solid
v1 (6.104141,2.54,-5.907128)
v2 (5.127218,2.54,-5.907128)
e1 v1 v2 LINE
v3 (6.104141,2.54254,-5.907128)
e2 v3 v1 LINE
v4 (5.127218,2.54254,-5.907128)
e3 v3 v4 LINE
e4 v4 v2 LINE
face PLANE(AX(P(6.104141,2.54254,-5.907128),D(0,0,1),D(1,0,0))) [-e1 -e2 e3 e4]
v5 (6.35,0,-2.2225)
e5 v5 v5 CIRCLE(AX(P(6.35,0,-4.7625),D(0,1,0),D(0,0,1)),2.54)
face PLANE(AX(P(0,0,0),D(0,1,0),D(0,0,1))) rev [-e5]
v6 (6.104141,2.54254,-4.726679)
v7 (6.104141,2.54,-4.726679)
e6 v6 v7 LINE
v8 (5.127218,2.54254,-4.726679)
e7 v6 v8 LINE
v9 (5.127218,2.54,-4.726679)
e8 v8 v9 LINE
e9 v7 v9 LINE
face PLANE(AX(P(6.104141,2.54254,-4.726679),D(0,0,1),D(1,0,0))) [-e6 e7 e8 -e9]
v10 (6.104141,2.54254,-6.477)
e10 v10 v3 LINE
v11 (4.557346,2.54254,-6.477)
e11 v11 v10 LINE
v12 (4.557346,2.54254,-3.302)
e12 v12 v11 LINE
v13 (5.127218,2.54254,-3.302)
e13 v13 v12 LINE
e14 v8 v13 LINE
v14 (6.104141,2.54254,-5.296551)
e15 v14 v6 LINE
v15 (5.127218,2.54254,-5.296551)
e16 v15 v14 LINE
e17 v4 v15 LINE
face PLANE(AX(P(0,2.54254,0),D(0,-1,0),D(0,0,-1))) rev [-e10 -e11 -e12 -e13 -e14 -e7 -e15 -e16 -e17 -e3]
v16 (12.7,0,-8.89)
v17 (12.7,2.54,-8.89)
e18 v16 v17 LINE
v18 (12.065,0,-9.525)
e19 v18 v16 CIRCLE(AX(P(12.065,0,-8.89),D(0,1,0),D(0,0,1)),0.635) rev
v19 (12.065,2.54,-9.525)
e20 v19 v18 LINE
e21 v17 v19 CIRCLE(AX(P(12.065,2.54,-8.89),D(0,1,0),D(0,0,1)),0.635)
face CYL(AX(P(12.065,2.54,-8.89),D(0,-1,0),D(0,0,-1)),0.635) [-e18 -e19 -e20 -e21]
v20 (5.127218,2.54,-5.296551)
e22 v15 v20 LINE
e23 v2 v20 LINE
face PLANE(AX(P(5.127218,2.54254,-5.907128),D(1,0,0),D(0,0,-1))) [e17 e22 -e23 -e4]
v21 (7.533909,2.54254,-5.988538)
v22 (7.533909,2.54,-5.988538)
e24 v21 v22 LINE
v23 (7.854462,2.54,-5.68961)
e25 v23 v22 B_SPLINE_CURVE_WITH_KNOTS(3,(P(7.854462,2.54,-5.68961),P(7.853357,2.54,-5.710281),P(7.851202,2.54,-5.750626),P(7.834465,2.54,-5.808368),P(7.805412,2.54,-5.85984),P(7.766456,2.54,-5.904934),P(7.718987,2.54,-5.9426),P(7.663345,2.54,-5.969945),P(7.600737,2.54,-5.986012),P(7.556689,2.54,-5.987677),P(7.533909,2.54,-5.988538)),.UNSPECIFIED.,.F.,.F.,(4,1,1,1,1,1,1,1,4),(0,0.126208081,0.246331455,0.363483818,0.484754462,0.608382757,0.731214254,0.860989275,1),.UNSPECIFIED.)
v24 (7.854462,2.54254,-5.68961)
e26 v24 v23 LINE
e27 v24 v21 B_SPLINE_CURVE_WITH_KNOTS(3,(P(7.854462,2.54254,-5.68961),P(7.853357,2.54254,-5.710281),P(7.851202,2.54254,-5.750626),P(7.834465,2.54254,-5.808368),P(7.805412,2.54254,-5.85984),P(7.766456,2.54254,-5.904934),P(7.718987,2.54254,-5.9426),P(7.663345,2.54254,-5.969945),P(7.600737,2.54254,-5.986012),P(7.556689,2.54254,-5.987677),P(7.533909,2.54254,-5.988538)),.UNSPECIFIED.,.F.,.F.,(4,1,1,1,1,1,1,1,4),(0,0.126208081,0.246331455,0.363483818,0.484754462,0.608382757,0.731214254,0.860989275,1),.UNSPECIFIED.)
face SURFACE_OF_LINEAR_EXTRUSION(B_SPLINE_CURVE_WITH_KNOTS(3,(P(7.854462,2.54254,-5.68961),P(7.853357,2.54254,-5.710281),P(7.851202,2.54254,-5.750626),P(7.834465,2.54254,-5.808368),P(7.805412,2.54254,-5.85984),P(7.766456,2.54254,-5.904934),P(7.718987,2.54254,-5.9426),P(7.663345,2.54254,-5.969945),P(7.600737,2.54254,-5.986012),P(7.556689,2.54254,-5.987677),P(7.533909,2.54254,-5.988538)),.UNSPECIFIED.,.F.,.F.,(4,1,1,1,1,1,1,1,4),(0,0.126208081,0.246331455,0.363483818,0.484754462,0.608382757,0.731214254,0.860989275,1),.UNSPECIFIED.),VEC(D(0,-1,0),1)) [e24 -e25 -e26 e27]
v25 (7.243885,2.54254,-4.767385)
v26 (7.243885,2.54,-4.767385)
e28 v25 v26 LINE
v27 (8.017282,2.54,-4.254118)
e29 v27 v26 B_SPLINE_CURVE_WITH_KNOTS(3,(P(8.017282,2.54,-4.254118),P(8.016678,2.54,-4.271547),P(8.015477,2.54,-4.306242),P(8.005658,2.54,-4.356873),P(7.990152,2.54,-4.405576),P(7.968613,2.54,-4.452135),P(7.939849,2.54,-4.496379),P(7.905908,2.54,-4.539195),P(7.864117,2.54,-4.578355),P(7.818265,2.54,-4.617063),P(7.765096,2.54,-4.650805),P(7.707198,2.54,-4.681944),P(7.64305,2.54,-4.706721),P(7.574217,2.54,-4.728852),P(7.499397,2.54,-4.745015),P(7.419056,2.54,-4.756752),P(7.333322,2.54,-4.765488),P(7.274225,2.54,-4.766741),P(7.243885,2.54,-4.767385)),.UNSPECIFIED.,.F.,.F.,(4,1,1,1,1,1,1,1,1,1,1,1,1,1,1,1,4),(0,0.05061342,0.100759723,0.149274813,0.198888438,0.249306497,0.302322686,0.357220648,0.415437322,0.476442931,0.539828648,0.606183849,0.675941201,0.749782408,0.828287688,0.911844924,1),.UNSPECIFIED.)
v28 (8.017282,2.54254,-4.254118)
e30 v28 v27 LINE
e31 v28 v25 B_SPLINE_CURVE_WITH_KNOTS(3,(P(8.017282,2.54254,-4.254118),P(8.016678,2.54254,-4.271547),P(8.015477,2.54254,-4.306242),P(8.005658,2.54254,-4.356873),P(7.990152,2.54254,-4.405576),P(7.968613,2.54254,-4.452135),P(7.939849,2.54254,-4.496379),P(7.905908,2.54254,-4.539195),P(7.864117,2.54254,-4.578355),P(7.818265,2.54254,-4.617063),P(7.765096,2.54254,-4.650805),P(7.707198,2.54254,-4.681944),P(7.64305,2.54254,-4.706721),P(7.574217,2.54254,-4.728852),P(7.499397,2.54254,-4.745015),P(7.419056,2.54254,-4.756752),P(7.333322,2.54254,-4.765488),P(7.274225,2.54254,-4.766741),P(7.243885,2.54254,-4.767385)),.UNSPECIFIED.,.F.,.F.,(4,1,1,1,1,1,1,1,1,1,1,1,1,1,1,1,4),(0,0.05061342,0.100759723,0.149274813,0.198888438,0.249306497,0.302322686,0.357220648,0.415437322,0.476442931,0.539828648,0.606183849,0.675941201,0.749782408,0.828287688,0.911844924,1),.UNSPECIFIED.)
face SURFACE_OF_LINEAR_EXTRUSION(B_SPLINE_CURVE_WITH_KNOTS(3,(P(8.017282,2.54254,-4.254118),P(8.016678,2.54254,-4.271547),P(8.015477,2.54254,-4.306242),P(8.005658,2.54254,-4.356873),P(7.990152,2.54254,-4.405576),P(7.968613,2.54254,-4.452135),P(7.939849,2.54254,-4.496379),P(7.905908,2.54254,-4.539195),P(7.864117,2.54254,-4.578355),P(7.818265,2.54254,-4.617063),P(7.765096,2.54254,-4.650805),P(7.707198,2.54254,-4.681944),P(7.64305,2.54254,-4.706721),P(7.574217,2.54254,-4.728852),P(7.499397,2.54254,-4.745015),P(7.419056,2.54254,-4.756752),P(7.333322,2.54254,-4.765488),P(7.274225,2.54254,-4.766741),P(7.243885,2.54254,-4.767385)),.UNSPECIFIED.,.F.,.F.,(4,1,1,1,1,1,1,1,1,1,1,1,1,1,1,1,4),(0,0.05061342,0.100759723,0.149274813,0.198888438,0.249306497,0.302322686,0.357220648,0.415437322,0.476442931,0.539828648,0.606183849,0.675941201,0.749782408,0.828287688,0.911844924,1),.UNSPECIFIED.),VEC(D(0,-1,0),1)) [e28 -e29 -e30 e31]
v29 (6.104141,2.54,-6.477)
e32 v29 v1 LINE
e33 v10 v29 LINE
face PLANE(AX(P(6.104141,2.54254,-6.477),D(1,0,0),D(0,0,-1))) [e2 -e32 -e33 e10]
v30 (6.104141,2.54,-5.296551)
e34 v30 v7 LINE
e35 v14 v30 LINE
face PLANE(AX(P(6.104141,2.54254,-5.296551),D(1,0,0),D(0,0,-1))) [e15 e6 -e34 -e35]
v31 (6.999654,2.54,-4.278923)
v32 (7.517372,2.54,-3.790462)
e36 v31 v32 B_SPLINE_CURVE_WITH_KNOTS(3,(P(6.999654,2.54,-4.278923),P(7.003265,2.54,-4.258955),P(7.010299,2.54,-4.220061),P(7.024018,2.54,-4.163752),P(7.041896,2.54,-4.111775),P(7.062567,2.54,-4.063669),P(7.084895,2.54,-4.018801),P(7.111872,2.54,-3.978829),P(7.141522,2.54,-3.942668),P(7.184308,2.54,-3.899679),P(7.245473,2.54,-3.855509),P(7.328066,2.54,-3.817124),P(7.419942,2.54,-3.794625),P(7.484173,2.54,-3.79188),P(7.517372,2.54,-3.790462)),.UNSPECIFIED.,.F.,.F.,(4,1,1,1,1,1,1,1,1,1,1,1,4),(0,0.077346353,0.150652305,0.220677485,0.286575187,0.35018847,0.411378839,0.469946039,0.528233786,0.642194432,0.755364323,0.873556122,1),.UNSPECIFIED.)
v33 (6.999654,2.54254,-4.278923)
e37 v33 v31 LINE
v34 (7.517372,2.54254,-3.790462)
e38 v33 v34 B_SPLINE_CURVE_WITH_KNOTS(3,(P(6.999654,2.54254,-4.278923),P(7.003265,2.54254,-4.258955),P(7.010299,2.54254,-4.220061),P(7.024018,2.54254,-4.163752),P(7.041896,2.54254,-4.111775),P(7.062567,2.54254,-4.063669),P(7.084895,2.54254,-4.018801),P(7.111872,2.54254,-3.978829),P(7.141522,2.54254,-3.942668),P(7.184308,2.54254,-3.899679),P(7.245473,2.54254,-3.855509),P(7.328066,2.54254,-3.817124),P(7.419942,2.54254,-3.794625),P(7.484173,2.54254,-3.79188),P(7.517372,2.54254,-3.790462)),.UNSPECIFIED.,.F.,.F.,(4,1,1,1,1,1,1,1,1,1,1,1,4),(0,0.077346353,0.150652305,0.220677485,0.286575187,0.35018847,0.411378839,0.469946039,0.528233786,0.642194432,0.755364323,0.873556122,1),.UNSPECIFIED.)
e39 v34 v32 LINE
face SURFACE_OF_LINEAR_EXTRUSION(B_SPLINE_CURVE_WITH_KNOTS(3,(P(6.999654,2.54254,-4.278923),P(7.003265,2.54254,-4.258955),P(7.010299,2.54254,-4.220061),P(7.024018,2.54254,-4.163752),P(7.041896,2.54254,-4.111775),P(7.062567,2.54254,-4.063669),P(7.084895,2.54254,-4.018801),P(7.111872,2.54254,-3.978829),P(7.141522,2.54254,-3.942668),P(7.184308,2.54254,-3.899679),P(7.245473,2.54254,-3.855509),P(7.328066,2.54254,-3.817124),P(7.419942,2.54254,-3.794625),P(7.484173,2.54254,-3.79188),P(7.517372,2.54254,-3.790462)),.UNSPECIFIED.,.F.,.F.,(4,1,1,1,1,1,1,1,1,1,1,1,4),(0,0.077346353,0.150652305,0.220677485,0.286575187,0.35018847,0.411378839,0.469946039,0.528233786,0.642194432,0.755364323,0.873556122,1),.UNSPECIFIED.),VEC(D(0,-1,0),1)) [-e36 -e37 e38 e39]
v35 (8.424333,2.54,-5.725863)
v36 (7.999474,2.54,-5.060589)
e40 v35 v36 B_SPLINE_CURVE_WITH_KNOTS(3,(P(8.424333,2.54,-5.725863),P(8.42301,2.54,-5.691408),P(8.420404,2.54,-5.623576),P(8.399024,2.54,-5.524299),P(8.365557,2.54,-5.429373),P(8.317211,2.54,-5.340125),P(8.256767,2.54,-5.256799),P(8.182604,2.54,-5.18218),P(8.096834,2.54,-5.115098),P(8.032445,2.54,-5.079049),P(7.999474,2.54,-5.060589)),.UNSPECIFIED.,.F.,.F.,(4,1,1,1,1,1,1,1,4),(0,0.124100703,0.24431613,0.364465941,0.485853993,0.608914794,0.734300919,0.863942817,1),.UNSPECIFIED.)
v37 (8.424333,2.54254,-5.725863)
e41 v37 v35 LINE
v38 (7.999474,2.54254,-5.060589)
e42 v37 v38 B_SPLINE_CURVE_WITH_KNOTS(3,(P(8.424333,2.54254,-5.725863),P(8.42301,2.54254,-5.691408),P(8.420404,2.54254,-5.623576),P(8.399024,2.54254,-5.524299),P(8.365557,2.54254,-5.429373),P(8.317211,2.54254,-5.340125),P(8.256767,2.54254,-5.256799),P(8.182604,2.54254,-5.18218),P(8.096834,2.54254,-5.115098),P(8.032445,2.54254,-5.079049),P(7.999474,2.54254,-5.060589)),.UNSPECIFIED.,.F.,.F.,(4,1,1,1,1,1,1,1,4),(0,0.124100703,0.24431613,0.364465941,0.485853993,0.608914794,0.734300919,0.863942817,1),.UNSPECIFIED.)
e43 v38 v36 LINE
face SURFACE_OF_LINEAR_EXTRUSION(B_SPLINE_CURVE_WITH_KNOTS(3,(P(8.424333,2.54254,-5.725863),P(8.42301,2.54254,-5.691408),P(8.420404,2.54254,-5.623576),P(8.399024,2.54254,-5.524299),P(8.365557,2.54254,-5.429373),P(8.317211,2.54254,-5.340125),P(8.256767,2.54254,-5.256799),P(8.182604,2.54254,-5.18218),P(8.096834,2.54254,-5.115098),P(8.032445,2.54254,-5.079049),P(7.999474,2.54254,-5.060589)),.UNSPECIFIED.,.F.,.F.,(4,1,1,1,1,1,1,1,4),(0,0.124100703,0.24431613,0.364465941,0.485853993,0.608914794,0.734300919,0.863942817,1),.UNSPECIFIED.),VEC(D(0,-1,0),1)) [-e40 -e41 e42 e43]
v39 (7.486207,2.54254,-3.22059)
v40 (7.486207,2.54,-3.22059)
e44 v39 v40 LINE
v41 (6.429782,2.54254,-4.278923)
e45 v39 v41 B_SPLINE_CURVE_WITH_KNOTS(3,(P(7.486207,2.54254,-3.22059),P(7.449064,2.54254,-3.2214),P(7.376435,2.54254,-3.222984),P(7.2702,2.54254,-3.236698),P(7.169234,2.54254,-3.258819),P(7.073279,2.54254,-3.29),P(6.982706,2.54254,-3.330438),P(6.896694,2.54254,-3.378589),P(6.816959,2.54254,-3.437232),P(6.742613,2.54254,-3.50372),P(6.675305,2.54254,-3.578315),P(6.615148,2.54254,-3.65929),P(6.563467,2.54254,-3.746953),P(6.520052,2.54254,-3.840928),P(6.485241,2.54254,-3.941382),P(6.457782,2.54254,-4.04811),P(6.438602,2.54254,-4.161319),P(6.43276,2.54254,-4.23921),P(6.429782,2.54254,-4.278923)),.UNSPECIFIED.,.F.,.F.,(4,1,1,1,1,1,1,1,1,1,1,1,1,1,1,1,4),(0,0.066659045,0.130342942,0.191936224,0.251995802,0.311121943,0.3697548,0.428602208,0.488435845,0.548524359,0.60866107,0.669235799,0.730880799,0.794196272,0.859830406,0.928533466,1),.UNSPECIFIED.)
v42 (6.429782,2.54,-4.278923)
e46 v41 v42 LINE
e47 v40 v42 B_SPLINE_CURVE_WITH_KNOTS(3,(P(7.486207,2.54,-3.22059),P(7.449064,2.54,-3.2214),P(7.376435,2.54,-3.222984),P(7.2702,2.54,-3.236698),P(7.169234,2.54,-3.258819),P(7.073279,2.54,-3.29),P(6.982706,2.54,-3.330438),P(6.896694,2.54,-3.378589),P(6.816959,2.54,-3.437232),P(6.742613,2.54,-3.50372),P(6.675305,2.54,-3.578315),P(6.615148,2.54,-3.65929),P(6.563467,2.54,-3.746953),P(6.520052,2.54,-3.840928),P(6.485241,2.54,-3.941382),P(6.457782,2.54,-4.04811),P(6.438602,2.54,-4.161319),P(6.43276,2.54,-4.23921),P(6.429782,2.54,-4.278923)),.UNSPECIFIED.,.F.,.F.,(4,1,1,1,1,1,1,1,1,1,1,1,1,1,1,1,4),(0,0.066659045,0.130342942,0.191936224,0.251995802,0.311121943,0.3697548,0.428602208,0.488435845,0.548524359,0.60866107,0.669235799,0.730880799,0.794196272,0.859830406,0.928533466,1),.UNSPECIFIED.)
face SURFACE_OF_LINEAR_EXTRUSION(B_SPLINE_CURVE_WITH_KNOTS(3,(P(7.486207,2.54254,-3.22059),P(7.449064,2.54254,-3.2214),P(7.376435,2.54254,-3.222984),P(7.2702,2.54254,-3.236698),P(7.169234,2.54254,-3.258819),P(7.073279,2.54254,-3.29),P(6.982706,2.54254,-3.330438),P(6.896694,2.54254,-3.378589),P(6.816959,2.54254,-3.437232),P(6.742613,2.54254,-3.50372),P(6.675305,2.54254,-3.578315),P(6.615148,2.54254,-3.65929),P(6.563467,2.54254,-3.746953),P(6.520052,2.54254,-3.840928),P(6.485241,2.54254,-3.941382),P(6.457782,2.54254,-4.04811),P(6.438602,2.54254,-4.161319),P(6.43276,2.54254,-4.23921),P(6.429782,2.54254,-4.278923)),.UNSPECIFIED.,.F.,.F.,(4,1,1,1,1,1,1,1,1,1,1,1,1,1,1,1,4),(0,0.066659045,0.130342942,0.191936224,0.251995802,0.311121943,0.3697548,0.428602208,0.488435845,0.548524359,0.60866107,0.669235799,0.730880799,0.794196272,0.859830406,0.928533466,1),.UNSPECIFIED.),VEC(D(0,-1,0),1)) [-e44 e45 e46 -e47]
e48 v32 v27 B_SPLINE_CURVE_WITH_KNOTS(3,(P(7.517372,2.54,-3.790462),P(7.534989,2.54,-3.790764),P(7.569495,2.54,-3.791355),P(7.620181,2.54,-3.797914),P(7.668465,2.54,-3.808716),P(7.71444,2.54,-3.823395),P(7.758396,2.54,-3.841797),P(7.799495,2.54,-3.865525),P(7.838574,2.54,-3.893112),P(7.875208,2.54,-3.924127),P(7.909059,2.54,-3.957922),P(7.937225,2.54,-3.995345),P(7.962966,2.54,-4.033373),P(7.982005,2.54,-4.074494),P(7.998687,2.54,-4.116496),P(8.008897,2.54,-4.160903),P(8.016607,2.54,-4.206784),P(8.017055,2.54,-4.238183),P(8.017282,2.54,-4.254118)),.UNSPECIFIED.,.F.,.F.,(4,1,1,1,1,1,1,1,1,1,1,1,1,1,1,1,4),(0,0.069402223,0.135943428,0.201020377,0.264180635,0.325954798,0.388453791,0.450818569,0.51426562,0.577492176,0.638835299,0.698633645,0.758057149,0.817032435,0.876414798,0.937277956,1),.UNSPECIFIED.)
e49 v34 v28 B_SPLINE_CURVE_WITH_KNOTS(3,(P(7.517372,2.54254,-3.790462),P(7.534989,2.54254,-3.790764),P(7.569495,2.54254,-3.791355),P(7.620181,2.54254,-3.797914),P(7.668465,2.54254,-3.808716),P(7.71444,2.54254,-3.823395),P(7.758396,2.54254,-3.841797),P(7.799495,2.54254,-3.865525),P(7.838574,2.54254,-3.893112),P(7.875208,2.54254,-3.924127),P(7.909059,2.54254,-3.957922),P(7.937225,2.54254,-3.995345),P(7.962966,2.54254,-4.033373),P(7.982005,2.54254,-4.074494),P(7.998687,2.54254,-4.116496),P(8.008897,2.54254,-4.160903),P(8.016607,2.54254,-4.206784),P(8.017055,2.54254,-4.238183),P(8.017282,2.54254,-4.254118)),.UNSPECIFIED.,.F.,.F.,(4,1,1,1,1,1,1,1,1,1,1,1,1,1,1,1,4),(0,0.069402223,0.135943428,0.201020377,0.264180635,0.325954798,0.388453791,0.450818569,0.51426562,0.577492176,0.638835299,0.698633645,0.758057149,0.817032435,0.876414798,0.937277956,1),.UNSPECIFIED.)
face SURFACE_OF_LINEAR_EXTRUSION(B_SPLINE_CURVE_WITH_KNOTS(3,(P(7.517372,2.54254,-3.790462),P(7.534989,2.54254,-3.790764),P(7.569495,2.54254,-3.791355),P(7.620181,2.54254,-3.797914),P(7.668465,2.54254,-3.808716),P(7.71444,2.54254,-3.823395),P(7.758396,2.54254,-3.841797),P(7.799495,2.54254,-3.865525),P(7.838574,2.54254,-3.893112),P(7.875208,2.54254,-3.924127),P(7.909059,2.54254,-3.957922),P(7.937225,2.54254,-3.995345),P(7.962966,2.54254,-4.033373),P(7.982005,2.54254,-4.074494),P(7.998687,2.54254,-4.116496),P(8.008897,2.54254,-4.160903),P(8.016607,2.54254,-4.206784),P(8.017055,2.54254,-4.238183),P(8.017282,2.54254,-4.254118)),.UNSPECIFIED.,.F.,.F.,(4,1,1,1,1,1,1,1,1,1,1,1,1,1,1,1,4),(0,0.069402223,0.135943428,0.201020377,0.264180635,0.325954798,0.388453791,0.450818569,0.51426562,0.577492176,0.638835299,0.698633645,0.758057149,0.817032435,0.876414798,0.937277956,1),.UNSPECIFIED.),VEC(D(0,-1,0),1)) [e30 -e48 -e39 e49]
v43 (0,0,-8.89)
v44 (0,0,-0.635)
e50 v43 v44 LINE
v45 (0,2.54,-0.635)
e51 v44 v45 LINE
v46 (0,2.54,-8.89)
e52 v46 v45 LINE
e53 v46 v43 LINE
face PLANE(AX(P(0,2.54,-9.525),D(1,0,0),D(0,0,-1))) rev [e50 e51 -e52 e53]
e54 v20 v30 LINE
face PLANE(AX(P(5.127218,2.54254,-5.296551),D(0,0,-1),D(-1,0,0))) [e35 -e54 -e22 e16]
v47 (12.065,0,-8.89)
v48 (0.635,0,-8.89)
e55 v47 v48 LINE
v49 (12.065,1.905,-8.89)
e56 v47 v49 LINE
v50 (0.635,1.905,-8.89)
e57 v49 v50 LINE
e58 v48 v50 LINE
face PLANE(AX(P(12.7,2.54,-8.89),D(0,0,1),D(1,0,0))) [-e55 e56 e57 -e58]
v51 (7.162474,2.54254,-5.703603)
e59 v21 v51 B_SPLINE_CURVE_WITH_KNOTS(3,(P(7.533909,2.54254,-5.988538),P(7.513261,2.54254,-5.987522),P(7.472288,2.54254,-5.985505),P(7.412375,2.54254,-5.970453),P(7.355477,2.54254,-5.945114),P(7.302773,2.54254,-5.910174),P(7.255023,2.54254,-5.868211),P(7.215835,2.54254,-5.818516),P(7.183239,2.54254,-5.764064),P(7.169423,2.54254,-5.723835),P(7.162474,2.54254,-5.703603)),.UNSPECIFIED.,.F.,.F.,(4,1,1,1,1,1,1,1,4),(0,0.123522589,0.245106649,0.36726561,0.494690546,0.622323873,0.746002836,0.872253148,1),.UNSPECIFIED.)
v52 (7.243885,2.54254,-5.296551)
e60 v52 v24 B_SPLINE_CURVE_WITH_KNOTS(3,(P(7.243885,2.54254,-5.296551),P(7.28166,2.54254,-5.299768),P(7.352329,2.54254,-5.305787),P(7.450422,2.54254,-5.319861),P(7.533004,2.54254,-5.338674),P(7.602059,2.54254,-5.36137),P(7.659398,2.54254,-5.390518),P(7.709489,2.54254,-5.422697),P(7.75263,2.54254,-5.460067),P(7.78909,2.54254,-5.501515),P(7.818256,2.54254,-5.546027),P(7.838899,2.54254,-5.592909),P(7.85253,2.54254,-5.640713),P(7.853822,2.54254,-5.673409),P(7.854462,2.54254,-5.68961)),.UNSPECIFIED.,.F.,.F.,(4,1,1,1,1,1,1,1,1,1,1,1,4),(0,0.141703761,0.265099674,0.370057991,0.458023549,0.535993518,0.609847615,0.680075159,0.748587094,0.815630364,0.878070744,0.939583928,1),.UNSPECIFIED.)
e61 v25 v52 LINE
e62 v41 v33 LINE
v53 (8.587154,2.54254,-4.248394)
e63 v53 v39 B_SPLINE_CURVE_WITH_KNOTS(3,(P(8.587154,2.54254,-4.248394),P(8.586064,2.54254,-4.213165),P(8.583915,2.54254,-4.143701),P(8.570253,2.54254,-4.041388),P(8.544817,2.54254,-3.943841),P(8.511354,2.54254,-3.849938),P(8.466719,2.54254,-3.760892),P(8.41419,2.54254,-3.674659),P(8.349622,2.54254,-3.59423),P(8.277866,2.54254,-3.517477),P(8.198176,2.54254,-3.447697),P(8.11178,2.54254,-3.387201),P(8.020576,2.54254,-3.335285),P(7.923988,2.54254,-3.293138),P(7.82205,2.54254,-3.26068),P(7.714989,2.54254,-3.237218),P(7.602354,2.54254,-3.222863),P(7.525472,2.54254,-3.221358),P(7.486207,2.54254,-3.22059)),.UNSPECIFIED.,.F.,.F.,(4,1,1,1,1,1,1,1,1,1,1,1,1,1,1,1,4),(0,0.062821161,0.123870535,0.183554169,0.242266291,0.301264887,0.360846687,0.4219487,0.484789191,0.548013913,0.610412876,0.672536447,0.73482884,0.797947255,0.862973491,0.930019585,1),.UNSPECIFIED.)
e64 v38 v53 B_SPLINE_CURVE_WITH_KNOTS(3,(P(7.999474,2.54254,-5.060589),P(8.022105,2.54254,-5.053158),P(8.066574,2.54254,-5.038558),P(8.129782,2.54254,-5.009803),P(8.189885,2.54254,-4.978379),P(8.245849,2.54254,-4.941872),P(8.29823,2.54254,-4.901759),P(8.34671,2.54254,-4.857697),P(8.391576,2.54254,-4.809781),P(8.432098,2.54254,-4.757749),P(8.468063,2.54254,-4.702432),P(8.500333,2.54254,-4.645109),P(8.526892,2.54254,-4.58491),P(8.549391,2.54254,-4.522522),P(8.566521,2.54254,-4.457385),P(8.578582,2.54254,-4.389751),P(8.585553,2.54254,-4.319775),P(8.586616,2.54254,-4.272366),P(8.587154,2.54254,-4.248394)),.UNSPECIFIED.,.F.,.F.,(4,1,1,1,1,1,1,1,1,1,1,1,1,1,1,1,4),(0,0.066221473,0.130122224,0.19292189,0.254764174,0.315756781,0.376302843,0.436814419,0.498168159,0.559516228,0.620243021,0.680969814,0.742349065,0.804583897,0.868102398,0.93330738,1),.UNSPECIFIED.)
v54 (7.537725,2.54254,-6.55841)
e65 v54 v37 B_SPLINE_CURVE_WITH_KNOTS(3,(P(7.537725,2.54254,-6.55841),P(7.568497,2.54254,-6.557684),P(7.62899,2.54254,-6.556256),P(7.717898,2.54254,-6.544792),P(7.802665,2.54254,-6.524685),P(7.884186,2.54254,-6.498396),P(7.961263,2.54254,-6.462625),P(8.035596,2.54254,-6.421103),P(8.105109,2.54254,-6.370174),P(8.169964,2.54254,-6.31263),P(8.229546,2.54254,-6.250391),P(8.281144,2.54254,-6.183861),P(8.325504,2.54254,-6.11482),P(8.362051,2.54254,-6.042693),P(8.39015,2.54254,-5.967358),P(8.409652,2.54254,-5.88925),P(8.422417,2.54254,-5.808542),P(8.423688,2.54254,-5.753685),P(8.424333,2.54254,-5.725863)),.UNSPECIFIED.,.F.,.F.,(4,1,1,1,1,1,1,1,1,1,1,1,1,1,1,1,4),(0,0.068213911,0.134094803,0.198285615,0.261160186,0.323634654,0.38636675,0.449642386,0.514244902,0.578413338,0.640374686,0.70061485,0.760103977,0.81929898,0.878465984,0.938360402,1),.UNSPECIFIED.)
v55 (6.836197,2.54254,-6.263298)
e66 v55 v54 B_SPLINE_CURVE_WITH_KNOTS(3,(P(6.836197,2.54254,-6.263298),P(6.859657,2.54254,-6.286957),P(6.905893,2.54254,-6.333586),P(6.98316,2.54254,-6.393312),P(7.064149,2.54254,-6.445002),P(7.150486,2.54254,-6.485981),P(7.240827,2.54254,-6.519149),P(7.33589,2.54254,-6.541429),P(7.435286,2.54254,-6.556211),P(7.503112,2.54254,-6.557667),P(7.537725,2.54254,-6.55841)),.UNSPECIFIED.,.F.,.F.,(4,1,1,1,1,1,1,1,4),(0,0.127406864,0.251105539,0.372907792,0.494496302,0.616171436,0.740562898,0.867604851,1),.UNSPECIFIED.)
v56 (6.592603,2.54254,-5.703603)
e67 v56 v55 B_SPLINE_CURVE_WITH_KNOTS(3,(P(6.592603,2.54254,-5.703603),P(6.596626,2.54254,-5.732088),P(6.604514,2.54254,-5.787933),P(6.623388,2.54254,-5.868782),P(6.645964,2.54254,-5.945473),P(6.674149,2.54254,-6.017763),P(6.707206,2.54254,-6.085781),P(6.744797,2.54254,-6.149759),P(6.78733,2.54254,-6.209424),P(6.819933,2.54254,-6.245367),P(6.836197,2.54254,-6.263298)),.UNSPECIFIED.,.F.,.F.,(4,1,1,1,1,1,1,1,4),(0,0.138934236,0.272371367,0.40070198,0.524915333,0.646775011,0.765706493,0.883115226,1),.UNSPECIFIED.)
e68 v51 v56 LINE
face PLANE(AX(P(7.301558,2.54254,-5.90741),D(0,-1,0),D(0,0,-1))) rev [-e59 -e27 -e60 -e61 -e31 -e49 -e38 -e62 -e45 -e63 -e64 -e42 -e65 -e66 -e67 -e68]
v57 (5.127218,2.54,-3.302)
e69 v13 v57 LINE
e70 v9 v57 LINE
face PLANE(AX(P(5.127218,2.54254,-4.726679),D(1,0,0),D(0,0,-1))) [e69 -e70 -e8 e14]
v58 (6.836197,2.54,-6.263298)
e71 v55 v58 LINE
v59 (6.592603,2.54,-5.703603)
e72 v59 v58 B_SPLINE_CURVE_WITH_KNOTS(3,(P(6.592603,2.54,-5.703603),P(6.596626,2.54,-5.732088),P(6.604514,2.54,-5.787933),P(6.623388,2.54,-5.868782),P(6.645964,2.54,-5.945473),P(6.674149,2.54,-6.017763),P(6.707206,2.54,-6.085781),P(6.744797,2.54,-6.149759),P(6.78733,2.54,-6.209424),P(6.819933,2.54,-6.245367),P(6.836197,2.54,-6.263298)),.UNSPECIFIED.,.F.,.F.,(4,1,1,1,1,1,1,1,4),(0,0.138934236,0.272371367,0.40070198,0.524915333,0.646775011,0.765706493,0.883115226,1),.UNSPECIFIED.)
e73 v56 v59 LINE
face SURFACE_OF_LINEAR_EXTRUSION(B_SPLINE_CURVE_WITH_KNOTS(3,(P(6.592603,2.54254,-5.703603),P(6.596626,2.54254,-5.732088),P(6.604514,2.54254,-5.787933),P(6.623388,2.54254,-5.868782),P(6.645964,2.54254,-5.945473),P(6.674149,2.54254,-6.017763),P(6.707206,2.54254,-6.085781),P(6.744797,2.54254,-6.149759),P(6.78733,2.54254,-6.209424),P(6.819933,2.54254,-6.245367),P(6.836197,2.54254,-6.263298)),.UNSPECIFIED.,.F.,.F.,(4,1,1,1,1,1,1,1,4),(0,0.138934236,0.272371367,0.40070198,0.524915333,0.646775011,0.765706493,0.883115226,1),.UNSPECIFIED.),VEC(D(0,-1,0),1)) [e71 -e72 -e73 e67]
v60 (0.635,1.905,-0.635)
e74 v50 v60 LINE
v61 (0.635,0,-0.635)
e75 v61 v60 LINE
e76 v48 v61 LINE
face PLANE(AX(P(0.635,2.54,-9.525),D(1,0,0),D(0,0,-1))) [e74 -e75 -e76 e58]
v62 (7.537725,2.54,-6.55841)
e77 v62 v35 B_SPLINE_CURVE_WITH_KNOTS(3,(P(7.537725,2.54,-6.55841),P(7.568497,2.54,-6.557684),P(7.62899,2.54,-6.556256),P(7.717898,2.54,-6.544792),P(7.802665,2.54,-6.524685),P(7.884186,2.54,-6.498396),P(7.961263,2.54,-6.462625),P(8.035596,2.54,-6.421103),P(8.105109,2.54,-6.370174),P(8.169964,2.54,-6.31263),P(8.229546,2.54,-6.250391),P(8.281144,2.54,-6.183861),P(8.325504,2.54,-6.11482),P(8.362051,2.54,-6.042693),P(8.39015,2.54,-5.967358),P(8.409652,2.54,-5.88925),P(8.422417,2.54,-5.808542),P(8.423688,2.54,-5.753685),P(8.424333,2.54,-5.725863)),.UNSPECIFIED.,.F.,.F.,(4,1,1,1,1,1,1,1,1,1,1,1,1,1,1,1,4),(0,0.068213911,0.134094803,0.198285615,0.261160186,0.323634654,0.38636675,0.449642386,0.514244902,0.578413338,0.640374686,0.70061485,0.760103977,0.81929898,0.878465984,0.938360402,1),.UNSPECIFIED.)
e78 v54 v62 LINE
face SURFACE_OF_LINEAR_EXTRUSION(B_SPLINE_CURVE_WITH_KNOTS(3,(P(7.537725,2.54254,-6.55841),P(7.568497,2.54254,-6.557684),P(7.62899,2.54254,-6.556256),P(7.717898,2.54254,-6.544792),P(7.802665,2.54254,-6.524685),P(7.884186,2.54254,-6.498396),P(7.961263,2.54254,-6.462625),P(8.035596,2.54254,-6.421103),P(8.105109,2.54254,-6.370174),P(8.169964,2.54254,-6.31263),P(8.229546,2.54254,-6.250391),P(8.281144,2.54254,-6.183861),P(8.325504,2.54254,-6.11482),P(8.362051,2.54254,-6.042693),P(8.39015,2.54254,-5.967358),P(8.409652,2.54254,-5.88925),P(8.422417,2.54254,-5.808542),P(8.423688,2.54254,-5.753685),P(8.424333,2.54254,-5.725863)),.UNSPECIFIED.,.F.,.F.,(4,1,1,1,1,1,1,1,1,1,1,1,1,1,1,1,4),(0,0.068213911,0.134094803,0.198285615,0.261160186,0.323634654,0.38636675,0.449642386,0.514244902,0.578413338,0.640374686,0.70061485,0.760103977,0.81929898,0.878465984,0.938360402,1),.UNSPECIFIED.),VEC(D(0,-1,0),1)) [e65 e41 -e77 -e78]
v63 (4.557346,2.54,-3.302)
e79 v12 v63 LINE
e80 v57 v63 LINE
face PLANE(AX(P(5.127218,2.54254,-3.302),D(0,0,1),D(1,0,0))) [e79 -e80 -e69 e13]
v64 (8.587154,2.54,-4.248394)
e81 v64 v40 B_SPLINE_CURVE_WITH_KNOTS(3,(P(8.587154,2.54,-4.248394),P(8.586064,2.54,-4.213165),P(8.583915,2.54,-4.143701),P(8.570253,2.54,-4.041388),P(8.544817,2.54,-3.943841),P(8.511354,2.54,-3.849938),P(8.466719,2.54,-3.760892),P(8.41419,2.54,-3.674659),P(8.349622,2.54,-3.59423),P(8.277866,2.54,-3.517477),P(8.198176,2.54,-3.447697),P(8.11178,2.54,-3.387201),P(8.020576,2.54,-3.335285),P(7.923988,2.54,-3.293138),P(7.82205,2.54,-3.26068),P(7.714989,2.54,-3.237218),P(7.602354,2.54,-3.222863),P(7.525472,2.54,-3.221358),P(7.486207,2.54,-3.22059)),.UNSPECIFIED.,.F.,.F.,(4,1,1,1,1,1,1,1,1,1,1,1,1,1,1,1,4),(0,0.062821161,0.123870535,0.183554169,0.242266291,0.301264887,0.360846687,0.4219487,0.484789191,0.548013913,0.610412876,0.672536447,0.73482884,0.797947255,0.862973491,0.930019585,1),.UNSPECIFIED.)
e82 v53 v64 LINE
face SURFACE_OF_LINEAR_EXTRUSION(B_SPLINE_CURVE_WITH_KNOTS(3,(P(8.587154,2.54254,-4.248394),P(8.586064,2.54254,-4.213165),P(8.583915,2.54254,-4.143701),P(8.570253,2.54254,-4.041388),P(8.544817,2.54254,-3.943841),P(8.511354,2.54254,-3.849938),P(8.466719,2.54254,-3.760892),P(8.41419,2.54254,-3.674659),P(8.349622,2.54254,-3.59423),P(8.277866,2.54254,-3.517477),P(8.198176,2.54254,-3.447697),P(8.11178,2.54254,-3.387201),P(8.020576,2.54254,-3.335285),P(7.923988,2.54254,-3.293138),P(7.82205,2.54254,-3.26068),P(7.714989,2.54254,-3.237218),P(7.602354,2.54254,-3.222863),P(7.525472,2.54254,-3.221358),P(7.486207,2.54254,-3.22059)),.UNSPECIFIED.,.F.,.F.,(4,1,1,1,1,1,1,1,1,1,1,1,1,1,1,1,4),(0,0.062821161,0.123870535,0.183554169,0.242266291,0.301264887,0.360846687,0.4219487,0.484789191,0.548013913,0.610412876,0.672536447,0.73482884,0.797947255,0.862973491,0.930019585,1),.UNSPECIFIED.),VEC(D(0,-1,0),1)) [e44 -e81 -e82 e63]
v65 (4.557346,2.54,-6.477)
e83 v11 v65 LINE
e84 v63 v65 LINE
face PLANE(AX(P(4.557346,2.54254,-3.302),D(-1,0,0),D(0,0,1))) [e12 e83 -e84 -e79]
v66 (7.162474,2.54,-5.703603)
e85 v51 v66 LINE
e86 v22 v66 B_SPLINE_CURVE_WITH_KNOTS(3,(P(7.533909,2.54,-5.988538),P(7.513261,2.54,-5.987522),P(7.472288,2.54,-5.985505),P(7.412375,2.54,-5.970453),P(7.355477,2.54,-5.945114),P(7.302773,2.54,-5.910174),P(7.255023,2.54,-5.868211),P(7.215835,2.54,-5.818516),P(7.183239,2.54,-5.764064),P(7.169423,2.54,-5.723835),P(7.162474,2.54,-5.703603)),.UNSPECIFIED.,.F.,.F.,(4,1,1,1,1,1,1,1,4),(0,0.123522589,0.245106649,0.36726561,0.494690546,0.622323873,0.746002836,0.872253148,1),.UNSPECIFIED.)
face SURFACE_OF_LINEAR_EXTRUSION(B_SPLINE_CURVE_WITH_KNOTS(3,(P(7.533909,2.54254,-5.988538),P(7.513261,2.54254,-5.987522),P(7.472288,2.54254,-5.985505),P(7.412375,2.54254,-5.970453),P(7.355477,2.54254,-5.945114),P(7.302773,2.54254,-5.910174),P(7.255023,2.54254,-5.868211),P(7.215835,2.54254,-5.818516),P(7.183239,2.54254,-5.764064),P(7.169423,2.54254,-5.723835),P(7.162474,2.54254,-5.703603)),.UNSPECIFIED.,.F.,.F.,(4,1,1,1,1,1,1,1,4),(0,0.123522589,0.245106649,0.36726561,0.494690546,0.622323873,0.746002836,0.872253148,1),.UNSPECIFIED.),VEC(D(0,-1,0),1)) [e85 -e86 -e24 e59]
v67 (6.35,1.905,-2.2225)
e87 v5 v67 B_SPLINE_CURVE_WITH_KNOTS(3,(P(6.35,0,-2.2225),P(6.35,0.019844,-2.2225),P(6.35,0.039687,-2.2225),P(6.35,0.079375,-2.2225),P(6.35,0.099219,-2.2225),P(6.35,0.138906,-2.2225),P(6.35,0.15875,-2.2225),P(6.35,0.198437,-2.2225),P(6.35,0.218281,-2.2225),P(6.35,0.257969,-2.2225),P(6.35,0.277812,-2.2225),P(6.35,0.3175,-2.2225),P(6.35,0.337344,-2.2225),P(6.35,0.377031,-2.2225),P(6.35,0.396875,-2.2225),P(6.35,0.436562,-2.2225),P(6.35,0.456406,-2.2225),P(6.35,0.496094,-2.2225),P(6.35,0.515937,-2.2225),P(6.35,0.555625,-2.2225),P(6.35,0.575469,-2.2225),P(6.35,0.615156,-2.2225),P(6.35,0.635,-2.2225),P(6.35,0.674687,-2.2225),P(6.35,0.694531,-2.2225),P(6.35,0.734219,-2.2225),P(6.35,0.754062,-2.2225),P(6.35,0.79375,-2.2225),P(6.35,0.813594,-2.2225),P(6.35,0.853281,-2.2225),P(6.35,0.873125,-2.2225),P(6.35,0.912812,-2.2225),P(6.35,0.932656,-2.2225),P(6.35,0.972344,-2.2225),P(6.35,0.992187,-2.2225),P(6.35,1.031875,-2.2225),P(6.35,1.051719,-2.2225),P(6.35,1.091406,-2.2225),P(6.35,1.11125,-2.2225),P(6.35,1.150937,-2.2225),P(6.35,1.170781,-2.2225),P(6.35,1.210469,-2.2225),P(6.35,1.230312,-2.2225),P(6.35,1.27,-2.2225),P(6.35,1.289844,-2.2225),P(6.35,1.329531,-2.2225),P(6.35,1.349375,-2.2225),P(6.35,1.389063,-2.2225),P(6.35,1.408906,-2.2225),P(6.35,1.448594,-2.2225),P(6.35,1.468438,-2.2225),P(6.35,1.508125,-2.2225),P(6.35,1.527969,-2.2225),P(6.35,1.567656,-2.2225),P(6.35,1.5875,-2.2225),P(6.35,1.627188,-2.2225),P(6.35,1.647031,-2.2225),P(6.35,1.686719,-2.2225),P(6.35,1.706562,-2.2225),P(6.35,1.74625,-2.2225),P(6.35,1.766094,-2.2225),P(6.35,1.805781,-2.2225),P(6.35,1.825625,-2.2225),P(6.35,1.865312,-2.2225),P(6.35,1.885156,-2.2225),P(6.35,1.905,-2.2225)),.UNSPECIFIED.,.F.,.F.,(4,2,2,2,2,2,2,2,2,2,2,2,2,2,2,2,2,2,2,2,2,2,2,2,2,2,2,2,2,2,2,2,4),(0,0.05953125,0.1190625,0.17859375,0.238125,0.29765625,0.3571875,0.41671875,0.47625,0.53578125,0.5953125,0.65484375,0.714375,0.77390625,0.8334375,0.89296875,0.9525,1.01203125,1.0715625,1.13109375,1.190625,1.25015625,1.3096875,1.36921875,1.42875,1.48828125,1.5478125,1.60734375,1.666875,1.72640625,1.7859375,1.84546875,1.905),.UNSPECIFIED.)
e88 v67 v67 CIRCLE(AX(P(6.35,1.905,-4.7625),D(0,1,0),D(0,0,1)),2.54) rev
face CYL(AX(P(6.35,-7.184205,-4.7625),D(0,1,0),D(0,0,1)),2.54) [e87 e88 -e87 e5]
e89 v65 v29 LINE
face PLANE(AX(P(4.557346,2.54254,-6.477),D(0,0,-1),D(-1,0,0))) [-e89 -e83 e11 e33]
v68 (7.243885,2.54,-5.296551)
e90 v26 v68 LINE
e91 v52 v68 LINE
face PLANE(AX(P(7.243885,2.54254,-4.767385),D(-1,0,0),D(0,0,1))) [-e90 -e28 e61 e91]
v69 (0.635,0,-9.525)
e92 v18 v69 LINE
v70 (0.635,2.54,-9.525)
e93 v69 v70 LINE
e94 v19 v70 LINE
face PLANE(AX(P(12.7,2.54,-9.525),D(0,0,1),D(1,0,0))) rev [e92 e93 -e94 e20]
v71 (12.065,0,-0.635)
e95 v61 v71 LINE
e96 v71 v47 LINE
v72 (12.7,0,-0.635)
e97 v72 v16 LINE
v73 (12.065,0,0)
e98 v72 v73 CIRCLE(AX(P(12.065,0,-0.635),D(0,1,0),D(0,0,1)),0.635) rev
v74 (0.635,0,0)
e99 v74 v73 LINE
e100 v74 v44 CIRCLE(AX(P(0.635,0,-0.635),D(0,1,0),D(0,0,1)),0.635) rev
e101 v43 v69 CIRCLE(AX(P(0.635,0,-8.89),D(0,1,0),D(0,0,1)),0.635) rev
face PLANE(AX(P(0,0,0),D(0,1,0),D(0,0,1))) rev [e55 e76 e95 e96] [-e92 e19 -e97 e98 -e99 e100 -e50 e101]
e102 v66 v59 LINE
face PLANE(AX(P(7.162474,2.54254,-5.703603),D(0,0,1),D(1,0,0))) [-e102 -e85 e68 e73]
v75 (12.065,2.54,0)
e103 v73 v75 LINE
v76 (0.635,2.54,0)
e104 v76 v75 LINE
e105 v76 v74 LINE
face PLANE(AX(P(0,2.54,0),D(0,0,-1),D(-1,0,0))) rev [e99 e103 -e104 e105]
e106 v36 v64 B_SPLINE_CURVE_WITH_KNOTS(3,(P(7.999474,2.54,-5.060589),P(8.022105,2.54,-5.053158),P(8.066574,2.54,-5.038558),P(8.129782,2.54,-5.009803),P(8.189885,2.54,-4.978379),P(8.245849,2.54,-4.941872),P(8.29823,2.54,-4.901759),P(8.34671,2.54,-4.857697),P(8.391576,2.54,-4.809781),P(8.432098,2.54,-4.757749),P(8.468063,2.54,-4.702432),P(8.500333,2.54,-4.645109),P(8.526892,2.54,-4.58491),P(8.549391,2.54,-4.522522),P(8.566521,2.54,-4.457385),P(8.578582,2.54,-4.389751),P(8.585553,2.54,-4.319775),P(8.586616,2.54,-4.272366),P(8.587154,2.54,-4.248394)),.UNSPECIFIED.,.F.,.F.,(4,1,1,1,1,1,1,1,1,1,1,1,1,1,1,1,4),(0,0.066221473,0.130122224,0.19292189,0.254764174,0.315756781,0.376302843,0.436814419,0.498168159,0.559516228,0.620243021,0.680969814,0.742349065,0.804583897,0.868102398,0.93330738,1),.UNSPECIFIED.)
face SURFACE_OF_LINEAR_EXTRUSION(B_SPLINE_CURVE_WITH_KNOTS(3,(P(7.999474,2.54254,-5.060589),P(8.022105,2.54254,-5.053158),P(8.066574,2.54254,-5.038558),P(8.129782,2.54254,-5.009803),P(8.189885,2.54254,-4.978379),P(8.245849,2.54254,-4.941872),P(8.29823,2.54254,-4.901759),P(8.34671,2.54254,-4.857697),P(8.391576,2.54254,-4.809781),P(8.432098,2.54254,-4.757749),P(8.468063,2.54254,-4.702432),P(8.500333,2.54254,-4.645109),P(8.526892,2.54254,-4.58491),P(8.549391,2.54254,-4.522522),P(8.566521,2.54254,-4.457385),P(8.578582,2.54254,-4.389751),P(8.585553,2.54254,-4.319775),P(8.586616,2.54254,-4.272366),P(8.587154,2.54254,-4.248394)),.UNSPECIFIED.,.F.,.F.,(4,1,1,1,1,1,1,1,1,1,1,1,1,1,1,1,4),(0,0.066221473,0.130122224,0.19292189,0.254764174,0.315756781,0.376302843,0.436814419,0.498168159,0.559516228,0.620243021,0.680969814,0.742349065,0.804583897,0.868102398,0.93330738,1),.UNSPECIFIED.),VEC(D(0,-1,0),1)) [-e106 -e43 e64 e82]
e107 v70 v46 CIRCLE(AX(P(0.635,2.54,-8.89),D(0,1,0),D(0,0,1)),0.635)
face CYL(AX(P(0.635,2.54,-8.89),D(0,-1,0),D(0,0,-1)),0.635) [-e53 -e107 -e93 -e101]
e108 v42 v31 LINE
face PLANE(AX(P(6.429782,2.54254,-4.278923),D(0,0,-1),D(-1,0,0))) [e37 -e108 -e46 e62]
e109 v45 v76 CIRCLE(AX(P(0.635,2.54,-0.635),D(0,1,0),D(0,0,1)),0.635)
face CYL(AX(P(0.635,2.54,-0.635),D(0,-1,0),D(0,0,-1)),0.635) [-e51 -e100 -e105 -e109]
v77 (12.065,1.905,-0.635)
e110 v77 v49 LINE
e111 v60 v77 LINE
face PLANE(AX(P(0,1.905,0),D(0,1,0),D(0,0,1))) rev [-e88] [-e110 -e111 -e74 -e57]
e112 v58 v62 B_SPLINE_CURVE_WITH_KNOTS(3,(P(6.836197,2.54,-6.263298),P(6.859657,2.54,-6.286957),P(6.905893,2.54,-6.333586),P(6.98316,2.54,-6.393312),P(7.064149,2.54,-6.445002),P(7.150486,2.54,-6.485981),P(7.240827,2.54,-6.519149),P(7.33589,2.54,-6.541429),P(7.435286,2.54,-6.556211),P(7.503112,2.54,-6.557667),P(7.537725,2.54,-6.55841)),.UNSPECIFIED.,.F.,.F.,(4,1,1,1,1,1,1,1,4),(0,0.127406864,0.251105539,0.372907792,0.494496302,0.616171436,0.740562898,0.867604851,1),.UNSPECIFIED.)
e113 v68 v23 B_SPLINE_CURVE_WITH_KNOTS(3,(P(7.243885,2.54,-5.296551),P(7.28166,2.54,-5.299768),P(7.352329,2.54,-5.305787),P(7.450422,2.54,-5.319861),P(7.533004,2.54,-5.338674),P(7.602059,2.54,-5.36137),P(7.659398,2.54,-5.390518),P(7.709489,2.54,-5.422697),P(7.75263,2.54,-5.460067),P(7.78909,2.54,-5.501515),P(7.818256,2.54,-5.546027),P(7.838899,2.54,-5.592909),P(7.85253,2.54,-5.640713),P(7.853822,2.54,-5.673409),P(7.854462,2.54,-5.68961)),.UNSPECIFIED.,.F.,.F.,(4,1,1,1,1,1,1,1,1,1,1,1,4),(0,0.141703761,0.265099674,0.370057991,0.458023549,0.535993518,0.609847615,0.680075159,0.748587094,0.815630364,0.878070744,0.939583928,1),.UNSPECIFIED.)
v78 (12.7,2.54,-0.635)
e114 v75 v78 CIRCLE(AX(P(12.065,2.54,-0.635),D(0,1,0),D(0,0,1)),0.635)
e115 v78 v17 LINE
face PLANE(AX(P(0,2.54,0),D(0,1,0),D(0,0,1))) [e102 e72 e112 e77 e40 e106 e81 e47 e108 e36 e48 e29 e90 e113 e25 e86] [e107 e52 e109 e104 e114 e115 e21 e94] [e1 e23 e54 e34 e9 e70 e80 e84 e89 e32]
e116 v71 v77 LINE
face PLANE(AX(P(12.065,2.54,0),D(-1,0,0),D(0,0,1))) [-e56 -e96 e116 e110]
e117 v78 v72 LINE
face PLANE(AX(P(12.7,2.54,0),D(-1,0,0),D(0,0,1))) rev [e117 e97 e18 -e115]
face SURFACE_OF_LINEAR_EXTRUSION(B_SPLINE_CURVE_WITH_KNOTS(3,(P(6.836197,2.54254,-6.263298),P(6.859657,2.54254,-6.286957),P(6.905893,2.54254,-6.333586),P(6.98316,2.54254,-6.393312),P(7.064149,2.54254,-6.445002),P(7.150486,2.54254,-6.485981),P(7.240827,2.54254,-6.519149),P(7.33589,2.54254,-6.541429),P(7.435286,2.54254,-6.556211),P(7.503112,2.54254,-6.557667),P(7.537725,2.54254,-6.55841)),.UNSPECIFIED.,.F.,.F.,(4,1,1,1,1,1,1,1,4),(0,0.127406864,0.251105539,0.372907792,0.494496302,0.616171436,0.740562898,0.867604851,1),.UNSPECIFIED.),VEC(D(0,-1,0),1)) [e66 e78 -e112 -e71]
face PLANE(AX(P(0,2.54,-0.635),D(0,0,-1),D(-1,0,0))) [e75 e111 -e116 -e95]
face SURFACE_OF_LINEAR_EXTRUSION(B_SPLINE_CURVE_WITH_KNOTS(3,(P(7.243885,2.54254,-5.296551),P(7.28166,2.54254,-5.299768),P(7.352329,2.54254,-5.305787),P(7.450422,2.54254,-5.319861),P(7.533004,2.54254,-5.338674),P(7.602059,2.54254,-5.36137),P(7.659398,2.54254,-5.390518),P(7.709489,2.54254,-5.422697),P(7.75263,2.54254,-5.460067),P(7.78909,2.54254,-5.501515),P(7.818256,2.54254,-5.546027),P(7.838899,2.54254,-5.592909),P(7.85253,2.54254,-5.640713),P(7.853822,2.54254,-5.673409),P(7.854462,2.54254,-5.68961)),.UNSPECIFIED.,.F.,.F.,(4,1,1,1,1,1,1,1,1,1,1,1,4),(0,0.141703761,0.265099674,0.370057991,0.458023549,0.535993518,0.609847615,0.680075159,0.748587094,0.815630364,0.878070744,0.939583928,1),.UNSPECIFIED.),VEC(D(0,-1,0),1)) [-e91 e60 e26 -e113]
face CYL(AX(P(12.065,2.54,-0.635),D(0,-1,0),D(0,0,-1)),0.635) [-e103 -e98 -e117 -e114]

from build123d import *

# Parameters (mm, degrees)
SKETCH1_W           = 12.7
SKETCH1_H           = 9.525
BOSS_EXTRUDE1_DEPTH = 2.54
FILLET1_R           = 0.635
SHELL1_START        = 0.635
SHELL1_OUTLINE_W    = 1.905
SHELL1_OUTLINE_H    = 8.255
SHELL1_DEPTH        = 11.43
SKETCH2_R           = 2.54
BOSS_EXTRUDE2_DEPTH = 1.905
BOSS_EXTRUDE3_DEPTH = 0.00254


# Read off the part's stored shape, not the designer's step: Shell1
with BuildPart() as part:
    # Sketch1 → Boss-Extrude1 (new body)
    with BuildSketch(Plane(origin=(0, 0, 0), x_dir=(1, 0, 0), z_dir=(0, 1, 0))):
        with Locations((6.35, 4.7625)):
            Rectangle(SKETCH1_W, SKETCH1_H)
    extrude(amount=BOSS_EXTRUDE1_DEPTH)

    # Fillet1
    fillet1_edges = [part.edges().sort_by_distance(p)[0] for p in [
        (0, 1.27, -9.525),
        (12.7, 1.27, -9.525),
        (12.7, 1.27, 0),
        (0, 1.27, 0),
    ]]
    fillet(fillet1_edges, radius=FILLET1_R)

    # Shell1 outline → Shell1 (cut)
    with BuildSketch(Plane.YZ.offset(SHELL1_START)):
        with Locations((0.9525, -4.7625)):
            Rectangle(SHELL1_OUTLINE_W, SHELL1_OUTLINE_H)
    extrude(amount=SHELL1_DEPTH, mode=Mode.SUBTRACT)

    # Sketch2 → Boss-Extrude2 (add)
    with BuildSketch(Plane(origin=(0, 1.905, 0), x_dir=(-1, 0, 0), z_dir=(0, -1, 0))):
        with Locations(Location((-6.35, 4.7625, 0), (0, 0, 270))):
            Circle(SKETCH2_R)
    extrude(amount=BOSS_EXTRUDE2_DEPTH)

    # Sketch3 → Boss-Extrude3 (add)
    with BuildSketch(Plane(origin=(0, 2.54, 0), x_dir=(1, 0, 0), z_dir=(0, 1, 0))):
        Polygon((4.557346154, 6.477), (6.104141026, 6.477), (6.104141026, 5.907128205), (5.127217949, 5.907128205), (5.127217949, 5.296551282), (6.104141026, 5.296551282), (6.104141026, 4.726679487), (5.127217949, 4.726679487), (5.127217949, 3.302), (4.557346154, 3.302), align=None)
        with BuildLine():
            Line((7.162474359, 5.703602564), (6.592602564, 5.703602564))
            add(Edge.make_bspline(
                [(6.592602564, 5.703602564), (6.596626076, 5.732088422), (6.604513904, 5.78793306), (6.623388421, 5.868782184), (6.645964381, 5.945473111), (6.674149313, 6.017762976), (6.707205653, 6.085780553), (6.744797255, 6.149759244), (6.787330498, 6.20942444), (6.81993268, 6.245366991), (6.836197316, 6.263298077)],
                knots=[0, 0, 0, 0, 1.111473889, 2.178970933, 3.205615836, 4.199322666, 5.174200091, 6.12565194, 7.064921805, 8, 8, 8, 8], degree=3))
            add(Edge.make_bspline(
                [(6.836197316, 6.263298077), (6.859656898, 6.286956845), (6.905893269, 6.333585791), (6.983159668, 6.39331232), (7.064149124, 6.44500157), (7.150485915, 6.48598118), (7.240826576, 6.519149428), (7.335889528, 6.541428614), (7.435286308, 6.556211051), (7.503112106, 6.557667173), (7.53772476, 6.558410256)],
                knots=[0, 0, 0, 0, 1.01925491, 2.00884431, 2.983262333, 3.955970413, 4.92937149, 5.924503185, 6.940838805, 8, 8, 8, 8], degree=3))
            add(Edge.make_bspline(
                [(7.53772476, 6.558410256), (7.56849719, 6.55768378), (7.628989587, 6.556255673), (7.71789819, 6.544791605), (7.802665103, 6.524684907), (7.884186336, 6.49839585), (7.961262978, 6.462625195), (8.035596185, 6.421103078), (8.105109084, 6.370174475), (8.169964323, 6.31263028), (8.22954623, 6.2503906), (8.281144422, 6.1838615), (8.325504313, 6.114820126), (8.362050997, 6.042692875), (8.39015043, 5.9673577), (8.40965227, 5.8892498), (8.422416697, 5.808541527), (8.423688368, 5.753685202), (8.424333333, 5.725863181)],
                knots=[0, 0, 0, 0, 1.091422571, 2.145516843, 3.172569842, 4.178562979, 5.178154469, 6.181868002, 7.194278174, 8.227918432, 9.254613415, 10.245994977, 11.209837596, 12.161663635, 13.10878368, 14.055455738, 15.013766427, 16, 16, 16, 16], degree=3))
            add(Edge.make_bspline(
                [(8.424333333, 5.725863181), (8.423009825, 5.691407926), (8.420404245, 5.623576121), (8.399023573, 5.524299234), (8.365557006, 5.429372814), (8.317211295, 5.340125024), (8.256766844, 5.256798746), (8.182603526, 5.182179827), (8.096833706, 5.115098345), (8.032445159, 5.079048748), (7.999473558, 5.060588742)],
                knots=[0, 0, 0, 0, 0.992805628, 1.954529043, 2.915727527, 3.886831945, 4.871318353, 5.87440735, 6.911542536, 8, 8, 8, 8], degree=3))
            add(Edge.make_bspline(
                [(7.999473558, 5.060588742), (8.022104759, 5.053158442), (8.066574055, 5.038558236), (8.129781812, 5.009803295), (8.189885167, 4.978378911), (8.245849161, 4.94187206), (8.298230423, 4.901758919), (8.346709632, 4.857696584), (8.391576439, 4.809781133), (8.432098412, 4.757749048), (8.468063246, 4.702432482), (8.500332577, 4.645109215), (8.526892035, 4.584909929), (8.549391202, 4.52252214), (8.566520788, 4.45738514), (8.578581546, 4.389751328), (8.585552961, 4.319774984), (8.58661622, 4.272366053), (8.587153846, 4.248394231)],
                knots=[0, 0, 0, 0, 1.059543567, 2.081955587, 3.086750234, 4.076226789, 5.052108497, 6.020845489, 6.989030705, 7.970690546, 8.952259656, 9.923888338, 10.895517021, 11.877585046, 12.873342345, 13.889638361, 14.932918083, 16, 16, 16, 16], degree=3))
            add(Edge.make_bspline(
                [(8.587153846, 4.248394231), (8.586064006, 4.213165386), (8.583915064, 4.143701278), (8.570253093, 4.041387755), (8.544816966, 3.943840902), (8.511354332, 3.849938294), (8.46671881, 3.760892179), (8.414190304, 3.674659071), (8.349622216, 3.594229511), (8.277865874, 3.517477148), (8.198176272, 3.447697337), (8.111779779, 3.387201381), (8.020576181, 3.335285086), (7.923988457, 3.29313796), (7.822050165, 3.260679852), (7.714988515, 3.237217635), (7.602353665, 3.222863063), (7.525471567, 3.221358258), (7.486207332, 3.220589744)],
                knots=[0, 0, 0, 0, 1.005138573, 1.981928558, 2.936866704, 3.876260664, 4.820238198, 5.773547, 6.751179199, 7.756627054, 8.768222608, 9.766606018, 10.760583154, 11.757261445, 12.767156078, 13.807575856, 14.880313354, 16, 16, 16, 16], degree=3))
            add(Edge.make_bspline(
                [(7.486207332, 3.220589744), (7.449063998, 3.221400012), (7.376435124, 3.222984385), (7.270200196, 3.236697937), (7.169233952, 3.258819009), (7.073278726, 3.290000494), (6.98270576, 3.330437552), (6.896693704, 3.378589014), (6.816958908, 3.437232146), (6.742612971, 3.503719685), (6.67530511, 3.578314929), (6.615147733, 3.659289915), (6.56346732, 3.746952559), (6.52005193, 3.84092833), (6.485240973, 3.941382088), (6.457782192, 4.048109556), (6.438601784, 4.161319247), (6.432760351, 4.239209923), (6.429782051, 4.278923077)],
                knots=[0, 0, 0, 0, 1.066544725, 2.085487077, 3.070979577, 4.031932826, 4.977951092, 5.916076795, 6.857635327, 7.814973522, 8.776389752, 9.738577119, 10.707772778, 11.69409279, 12.707140348, 13.757286496, 14.856535458, 16, 16, 16, 16], degree=3))
            Line((6.429782051, 4.278923077), (6.999653846, 4.278923077))
            add(Edge.make_bspline(
                [(6.999653846, 4.278923077), (7.003265064, 4.258954782), (7.010298859, 4.220061291), (7.024017843, 4.163752162), (7.041895594, 4.111775358), (7.062566722, 4.063668911), (7.084894652, 4.018801199), (7.111872131, 3.978829299), (7.141522391, 3.942667809), (7.184307932, 3.899678631), (7.245472811, 3.855509046), (7.32806566, 3.817123574), (7.419942383, 3.794624972), (7.484173376, 3.791880212), (7.517372196, 3.790461538)],
                knots=[0, 0, 0, 0, 0.928156231, 1.807827665, 2.648129825, 3.438902246, 4.202261636, 4.936546065, 5.639352463, 6.338805438, 7.70633318, 9.064371875, 10.482673459, 12, 12, 12, 12], degree=3))
            add(Edge.make_bspline(
                [(7.517372196, 3.790461538), (7.534988663, 3.790763632), (7.569495381, 3.791355365), (7.620180613, 3.797913931), (7.668465432, 3.808715896), (7.714439772, 3.823395366), (7.758396309, 3.841796999), (7.799495209, 3.865524803), (7.83857417, 3.893111763), (7.875208368, 3.92412683), (7.909059122, 3.95792215), (7.937224941, 3.995344725), (7.96296646, 4.033372751), (7.982005074, 4.074494153), (7.998687001, 4.116496162), (8.008897192, 4.160903319), (8.01660662, 4.206784081), (8.017054661, 4.23818286), (8.017282051, 4.254118389)],
                knots=[0, 0, 0, 0, 1.110435564, 2.175094844, 3.216326037, 4.226890168, 5.215276772, 6.21526065, 7.213097102, 8.228249917, 9.239874822, 10.221364777, 11.178138315, 12.128914389, 13.072518965, 14.022636769, 14.996447288, 16, 16, 16, 16], degree=3))
            add(Edge.make_bspline(
                [(8.017282051, 4.254118389), (8.016678373, 4.271546606), (8.015476588, 4.306242192), (8.005657881, 4.356873103), (7.990152068, 4.40557596), (7.968612599, 4.452135082), (7.939849038, 4.496378862), (7.905908357, 4.539194964), (7.864116592, 4.578354886), (7.818265429, 4.617063282), (7.765096093, 4.65080533), (7.707198004, 4.681944282), (7.643049511, 4.706721274), (7.574216537, 4.728851717), (7.499397041, 4.74501545), (7.419055624, 4.756751894), (7.33332189, 4.765487859), (7.274224512, 4.766741177), (7.243884615, 4.767384615)],
                knots=[0, 0, 0, 0, 0.809814727, 1.612155564, 2.388397, 3.182215007, 3.988903953, 4.837162975, 5.715530372, 6.646997145, 7.623086902, 8.637258368, 9.698941581, 10.815059213, 11.996518529, 13.252603015, 14.589518788, 16, 16, 16, 16], degree=3))
            Line((7.243884615, 4.767384615), (7.243884615, 5.296551282))
            add(Edge.make_bspline(
                [(7.243884615, 5.296551282), (7.281659591, 5.29976832), (7.35232909, 5.30578676), (7.450422144, 5.319861093), (7.53300385, 5.338673756), (7.602059062, 5.361370215), (7.659398085, 5.390518382), (7.709489139, 5.422696672), (7.752629925, 5.460067052), (7.789089675, 5.501515143), (7.818256341, 5.546026507), (7.838898809, 5.592909304), (7.852530015, 5.640712924), (7.853821571, 5.673409158), (7.854461538, 5.689610176)],
                knots=[0, 0, 0, 0, 1.70044513, 3.18119609, 4.440695891, 5.496282586, 6.431922213, 7.318171381, 8.16090191, 8.983045123, 9.787564368, 10.536848927, 11.275007137, 12, 12, 12, 12], degree=3))
            add(Edge.make_bspline(
                [(7.854461538, 5.689610176), (7.853357412, 5.710280916), (7.85120239, 5.750625824), (7.834465326, 5.808367886), (7.805411679, 5.859840149), (7.766455839, 5.9049343), (7.718986794, 5.942600315), (7.663344752, 5.969945199), (7.600737148, 5.98601154), (7.556689325, 5.987677078), (7.533908654, 5.988538462)],
                knots=[0, 0, 0, 0, 1.009664648, 1.970651636, 2.907870547, 3.878035693, 4.867062054, 5.849714035, 6.887914197, 8, 8, 8, 8], degree=3))
            add(Edge.make_bspline(
                [(7.533908654, 5.988538462), (7.513260536, 5.987522119), (7.472288347, 5.985505385), (7.412374743, 5.970453015), (7.355476781, 5.945114223), (7.302772655, 5.910173522), (7.255023163, 5.868211222), (7.215834605, 5.818515587), (7.183239421, 5.764063969), (7.169423181, 5.723835374), (7.162474359, 5.703602564)],
                knots=[0, 0, 0, 0, 0.98818071, 1.960853194, 2.938124878, 3.957524365, 4.978590984, 5.968022688, 6.978025184, 8, 8, 8, 8], degree=3))
        make_face()
    extrude(amount=BOSS_EXTRUDE3_DEPTH)


solid = part.part
